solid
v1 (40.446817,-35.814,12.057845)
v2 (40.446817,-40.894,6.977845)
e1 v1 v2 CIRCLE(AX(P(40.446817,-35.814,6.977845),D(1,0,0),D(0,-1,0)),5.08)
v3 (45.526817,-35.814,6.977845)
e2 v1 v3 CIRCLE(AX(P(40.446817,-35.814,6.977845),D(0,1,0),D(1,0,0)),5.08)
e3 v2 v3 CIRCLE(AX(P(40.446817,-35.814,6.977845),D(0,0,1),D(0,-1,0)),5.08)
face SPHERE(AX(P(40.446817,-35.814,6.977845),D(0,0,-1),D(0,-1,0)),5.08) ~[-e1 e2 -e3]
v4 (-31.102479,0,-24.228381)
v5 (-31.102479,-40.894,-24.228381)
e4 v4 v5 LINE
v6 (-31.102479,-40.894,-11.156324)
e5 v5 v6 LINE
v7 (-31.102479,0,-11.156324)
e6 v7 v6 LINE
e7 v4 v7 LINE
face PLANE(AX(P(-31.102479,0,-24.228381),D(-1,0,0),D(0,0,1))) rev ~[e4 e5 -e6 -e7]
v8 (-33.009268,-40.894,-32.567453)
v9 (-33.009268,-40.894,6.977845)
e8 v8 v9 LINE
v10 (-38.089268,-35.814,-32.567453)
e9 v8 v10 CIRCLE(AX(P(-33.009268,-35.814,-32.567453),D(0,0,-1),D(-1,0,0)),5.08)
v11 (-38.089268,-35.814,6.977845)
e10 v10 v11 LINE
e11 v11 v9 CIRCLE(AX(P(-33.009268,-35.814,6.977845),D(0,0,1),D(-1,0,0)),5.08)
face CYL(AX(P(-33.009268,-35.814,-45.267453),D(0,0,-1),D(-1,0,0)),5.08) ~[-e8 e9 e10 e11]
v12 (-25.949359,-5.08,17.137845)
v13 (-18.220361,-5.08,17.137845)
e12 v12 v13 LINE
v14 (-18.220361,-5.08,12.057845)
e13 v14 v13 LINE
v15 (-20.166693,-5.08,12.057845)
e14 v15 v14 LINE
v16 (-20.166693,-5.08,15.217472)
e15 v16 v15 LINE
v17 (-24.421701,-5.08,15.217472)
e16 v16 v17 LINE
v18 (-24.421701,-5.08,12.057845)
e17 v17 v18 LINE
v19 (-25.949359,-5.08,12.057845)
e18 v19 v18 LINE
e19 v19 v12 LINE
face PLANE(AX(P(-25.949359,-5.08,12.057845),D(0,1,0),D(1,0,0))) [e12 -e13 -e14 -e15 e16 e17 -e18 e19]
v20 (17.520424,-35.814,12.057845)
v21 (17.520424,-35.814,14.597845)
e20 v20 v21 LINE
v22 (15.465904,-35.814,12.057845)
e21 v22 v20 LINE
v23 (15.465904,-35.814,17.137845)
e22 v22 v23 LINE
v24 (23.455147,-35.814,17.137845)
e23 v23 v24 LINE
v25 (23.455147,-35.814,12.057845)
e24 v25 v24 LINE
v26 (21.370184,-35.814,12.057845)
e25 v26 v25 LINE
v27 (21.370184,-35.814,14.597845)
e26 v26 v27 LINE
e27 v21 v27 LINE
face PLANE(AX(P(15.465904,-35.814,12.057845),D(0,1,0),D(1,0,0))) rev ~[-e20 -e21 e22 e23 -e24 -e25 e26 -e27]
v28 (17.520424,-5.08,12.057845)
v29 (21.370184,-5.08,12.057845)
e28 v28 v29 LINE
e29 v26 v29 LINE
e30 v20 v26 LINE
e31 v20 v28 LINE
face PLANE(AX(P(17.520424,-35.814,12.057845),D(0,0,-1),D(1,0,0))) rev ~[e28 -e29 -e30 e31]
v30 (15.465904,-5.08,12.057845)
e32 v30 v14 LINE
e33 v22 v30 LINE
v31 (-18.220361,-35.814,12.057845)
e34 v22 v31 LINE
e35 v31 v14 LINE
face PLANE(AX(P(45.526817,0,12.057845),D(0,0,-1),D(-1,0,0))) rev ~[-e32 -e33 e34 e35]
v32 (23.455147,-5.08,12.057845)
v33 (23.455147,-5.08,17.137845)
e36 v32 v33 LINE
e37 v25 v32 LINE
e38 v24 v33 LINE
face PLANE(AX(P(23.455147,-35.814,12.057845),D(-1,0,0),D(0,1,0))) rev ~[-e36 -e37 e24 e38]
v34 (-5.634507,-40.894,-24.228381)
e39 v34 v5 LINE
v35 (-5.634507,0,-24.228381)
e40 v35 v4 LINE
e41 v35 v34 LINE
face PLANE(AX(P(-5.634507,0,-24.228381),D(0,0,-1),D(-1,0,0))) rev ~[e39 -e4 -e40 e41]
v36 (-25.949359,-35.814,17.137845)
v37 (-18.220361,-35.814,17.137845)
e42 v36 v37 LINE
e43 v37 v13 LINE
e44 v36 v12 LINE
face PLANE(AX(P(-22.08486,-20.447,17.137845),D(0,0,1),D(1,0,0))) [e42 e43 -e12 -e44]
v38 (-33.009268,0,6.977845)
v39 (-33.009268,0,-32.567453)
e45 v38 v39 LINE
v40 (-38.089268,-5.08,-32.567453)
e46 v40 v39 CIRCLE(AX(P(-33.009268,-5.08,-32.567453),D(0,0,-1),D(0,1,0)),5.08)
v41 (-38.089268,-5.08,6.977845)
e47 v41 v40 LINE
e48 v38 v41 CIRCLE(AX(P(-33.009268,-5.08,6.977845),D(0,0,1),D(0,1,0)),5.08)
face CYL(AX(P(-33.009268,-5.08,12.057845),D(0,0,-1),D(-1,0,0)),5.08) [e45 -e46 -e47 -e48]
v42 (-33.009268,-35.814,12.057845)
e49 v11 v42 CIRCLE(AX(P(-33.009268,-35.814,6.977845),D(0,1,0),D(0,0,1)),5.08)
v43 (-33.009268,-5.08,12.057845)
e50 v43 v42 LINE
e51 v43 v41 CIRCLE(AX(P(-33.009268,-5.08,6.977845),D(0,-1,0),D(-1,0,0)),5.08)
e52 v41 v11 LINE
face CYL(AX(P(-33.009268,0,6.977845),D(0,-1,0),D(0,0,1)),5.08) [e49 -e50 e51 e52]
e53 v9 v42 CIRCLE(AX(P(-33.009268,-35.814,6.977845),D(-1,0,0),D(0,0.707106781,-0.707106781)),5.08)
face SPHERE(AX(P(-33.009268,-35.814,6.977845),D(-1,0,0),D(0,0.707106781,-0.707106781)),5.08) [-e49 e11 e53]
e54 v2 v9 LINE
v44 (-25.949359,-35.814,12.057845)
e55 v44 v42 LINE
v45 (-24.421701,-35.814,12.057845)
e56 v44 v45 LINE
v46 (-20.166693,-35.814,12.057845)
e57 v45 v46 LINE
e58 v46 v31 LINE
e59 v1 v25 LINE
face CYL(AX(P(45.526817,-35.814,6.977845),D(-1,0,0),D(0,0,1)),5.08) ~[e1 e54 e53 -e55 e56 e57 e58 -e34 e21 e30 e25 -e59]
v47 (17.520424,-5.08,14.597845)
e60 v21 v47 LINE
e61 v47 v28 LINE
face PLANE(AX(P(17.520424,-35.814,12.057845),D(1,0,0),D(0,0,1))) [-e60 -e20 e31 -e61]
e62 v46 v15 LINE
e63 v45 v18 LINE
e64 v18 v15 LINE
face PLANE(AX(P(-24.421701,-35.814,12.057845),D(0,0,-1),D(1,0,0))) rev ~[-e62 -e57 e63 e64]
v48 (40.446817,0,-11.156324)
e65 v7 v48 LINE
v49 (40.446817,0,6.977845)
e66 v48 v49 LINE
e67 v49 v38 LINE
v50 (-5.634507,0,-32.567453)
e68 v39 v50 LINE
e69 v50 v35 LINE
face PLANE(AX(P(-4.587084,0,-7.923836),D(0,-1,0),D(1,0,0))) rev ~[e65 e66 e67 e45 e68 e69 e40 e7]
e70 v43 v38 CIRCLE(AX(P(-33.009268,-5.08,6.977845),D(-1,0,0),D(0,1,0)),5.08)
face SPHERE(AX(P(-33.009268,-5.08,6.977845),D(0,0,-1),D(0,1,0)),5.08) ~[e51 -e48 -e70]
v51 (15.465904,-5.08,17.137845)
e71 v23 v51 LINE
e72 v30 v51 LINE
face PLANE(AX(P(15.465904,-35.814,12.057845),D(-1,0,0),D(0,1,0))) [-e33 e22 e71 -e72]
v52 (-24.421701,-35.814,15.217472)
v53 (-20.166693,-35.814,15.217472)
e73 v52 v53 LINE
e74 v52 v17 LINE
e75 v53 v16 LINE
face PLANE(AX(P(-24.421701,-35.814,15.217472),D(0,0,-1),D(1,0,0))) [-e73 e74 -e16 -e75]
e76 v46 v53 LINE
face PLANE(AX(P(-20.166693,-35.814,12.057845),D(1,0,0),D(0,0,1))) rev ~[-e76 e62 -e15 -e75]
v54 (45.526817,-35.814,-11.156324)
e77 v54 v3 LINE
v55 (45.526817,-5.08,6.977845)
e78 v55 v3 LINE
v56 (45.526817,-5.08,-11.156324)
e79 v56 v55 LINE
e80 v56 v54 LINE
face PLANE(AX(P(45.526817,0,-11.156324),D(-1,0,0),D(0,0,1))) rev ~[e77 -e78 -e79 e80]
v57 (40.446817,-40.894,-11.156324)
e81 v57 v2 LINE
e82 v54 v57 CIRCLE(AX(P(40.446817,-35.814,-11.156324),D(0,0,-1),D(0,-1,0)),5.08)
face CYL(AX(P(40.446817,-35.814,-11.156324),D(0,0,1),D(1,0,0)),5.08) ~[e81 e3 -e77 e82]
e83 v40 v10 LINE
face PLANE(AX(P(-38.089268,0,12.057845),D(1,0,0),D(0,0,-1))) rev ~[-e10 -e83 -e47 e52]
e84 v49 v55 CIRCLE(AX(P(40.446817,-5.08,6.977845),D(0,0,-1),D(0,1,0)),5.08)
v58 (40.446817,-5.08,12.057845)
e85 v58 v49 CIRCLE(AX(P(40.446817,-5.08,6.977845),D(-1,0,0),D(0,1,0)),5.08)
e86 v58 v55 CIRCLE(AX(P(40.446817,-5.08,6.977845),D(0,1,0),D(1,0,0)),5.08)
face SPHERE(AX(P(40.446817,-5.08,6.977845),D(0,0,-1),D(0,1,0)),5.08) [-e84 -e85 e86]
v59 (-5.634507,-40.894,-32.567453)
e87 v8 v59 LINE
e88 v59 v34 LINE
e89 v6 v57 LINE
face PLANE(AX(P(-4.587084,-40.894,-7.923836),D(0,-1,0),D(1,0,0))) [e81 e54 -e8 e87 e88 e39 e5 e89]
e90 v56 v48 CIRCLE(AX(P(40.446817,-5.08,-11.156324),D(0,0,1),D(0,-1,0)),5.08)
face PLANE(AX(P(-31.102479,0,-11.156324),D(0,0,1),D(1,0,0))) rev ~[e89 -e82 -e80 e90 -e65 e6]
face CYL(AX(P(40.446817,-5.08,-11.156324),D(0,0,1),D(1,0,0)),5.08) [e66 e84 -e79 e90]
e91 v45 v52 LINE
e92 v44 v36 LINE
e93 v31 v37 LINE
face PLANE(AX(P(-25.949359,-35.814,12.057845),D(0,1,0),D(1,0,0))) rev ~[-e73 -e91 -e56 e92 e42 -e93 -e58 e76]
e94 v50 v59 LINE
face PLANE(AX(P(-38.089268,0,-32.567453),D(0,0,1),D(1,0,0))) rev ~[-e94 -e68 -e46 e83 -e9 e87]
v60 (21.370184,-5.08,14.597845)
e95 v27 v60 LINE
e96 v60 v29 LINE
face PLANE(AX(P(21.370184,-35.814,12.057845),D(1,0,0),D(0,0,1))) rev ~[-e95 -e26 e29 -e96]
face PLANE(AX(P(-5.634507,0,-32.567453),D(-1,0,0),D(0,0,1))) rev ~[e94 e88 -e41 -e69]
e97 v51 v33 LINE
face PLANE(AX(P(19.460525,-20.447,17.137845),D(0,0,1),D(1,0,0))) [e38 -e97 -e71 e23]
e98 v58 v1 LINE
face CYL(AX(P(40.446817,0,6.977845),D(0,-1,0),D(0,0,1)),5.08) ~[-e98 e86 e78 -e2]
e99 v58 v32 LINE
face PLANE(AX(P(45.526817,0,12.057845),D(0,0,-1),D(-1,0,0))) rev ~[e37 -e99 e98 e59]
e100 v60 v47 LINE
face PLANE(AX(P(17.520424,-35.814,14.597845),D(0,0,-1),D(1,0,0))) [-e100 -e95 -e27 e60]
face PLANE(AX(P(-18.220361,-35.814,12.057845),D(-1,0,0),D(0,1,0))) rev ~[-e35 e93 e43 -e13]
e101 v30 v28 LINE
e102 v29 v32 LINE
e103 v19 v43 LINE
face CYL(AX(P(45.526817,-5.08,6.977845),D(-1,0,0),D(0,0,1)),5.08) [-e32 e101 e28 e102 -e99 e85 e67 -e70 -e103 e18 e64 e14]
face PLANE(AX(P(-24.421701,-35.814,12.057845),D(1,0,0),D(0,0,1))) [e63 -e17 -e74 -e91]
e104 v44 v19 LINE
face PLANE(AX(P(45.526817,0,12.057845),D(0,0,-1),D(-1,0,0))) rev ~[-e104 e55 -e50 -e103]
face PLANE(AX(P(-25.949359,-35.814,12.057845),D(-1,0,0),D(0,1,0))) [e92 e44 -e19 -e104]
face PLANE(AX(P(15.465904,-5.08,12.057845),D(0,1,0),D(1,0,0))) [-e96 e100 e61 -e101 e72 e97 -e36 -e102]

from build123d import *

# Parameters (mm, degrees)
F1_DEPTH    = 40.894
F2_R        = 5.08
F3_T1_DEPTH = 52.2452971888
F3_S5_W     = 5.08
F3_S5_H     = 5.08
F3_T6_DEPTH = 5.08
F4_W        = 7.728997618
F4_H        = 30.734
F4_W_2      = 7.9892426729
F5_DEPTH    = 5.08
F6_W        = 4.2550079525
F6_H        = 3.1596273184
F6_W_2      = 3.8497596979
F6_H_2      = 2.54
F7_DEPTH    = 39.37


# Not quite as in the source:
# - a fillet or chamfer that OpenCascade refuses, or shapes differently, is made with other operations: its cross-section is extruded or revolved along the edge and cut away or added
# - a feature of the source that left no trace in its solid (it failed there, or was rolled back) is left out


with BuildPart() as f1:
    # F0 (on Front) → F1 (new body)
    with BuildSketch(Plane.XZ):
        Polygon((45.526817441, 12.0578445494), (-38.0892679095, 12.0578445494), (-38.0892679095, -11.1563242972), (-38.0892679095, -32.5674526393), (-5.6345071644, -32.5674526393), (-5.6345071644, -24.228380993), (-31.1024785042, -24.228380993), (-31.1024785042, -11.1563242972), (45.526817441, -11.1563242972), align=None)
    extrude(amount=F1_DEPTH)

    # F2
    f2_edges = [f1.edges().sort_by_distance(p)[0] for p in [
        (45.526817, 0, 0.45076),
        (45.526817, -40.894, 0.45076),
        (-38.089268, 0, -10.254804),
        (3.718775, 0, 12.057845),
        (3.718775, -40.894, 12.057845),
        (45.526817, -20.447, 12.057845),
        (-38.089268, -20.447, 12.057845),
    ]]
    fillet(f2_edges, radius=F2_R)

    # F3: fillet of radius 5.08 on 1 edges, made by hand

    # F3_s2 → F3_t1 (cut)
    with BuildSketch(Plane.XY.offset(-45.2674526393)):
        with BuildLine():
            ThreePointArc((-38.0892679095, -35.814), (-36.601370358, -39.4061024484), (-33.0092679095, -40.894))
            Line((-33.0092679095, -40.894), (-38.0892679095, -40.894))
            Line((-38.0892679095, -40.894), (-38.0892679095, -35.814))
        make_face()
    extrude(amount=F3_T1_DEPTH, mode=Mode.SUBTRACT)


with BuildPart() as f3_tool4:
    # F3_s5 → F3_t6 (new body)
    with BuildSketch(Plane.YZ.offset(-33.0092679095)):
        with Locations((-38.354, 9.5178445494)):
            Rectangle(F3_S5_W, F3_S5_H)
    extrude(amount=-F3_T6_DEPTH)

    # F3_s7 → F3_t8 (revolve, cut)
    with BuildSketch(Plane(origin=(-33.0092679095, -35.814, 6.9778445494), x_dir=(0, 0.7071067812, -0.7071067812), z_dir=(0, 0.7071067812, 0.7071067812))):
        with BuildLine():
            ThreePointArc((0, -5.08), (5.08, 0), (0, 5.08))
            Line((0, 5.08), (0, -5.08))
        make_face()
    revolve(axis=Axis((-33.0092679095, -35.814, 6.9778445494), (-1, 0, 0)), mode=Mode.SUBTRACT)


with BuildPart() as f1_1:
    add(f1.part)

    # F3_t3: cut F3_tool4
    add(f3_tool4.part, mode=Mode.SUBTRACT)

    # F4 (on face) → F5 (join)
    with BuildSketch(Plane.XY.offset(12.0578445494)):
        with Locations((-22.0848601311, -20.447)):
            Rectangle(F4_W, F4_H)
        with Locations((19.4605253637, -20.447)):
            Rectangle(F4_W_2, F4_H)
    extrude(amount=F5_DEPTH)

    # F6 (on face) → F7 (cut)
    with BuildSketch(Plane.XZ.offset(35.814)):
        with Locations((-22.2941972315, 13.6376582086)):
            Rectangle(F6_W, F6_H)
        with Locations((19.4453038275, 13.3278445494)):
            Rectangle(F6_W_2, F6_H_2)
    extrude(amount=-F7_DEPTH, mode=Mode.SUBTRACT)


solid = f1_1.part
